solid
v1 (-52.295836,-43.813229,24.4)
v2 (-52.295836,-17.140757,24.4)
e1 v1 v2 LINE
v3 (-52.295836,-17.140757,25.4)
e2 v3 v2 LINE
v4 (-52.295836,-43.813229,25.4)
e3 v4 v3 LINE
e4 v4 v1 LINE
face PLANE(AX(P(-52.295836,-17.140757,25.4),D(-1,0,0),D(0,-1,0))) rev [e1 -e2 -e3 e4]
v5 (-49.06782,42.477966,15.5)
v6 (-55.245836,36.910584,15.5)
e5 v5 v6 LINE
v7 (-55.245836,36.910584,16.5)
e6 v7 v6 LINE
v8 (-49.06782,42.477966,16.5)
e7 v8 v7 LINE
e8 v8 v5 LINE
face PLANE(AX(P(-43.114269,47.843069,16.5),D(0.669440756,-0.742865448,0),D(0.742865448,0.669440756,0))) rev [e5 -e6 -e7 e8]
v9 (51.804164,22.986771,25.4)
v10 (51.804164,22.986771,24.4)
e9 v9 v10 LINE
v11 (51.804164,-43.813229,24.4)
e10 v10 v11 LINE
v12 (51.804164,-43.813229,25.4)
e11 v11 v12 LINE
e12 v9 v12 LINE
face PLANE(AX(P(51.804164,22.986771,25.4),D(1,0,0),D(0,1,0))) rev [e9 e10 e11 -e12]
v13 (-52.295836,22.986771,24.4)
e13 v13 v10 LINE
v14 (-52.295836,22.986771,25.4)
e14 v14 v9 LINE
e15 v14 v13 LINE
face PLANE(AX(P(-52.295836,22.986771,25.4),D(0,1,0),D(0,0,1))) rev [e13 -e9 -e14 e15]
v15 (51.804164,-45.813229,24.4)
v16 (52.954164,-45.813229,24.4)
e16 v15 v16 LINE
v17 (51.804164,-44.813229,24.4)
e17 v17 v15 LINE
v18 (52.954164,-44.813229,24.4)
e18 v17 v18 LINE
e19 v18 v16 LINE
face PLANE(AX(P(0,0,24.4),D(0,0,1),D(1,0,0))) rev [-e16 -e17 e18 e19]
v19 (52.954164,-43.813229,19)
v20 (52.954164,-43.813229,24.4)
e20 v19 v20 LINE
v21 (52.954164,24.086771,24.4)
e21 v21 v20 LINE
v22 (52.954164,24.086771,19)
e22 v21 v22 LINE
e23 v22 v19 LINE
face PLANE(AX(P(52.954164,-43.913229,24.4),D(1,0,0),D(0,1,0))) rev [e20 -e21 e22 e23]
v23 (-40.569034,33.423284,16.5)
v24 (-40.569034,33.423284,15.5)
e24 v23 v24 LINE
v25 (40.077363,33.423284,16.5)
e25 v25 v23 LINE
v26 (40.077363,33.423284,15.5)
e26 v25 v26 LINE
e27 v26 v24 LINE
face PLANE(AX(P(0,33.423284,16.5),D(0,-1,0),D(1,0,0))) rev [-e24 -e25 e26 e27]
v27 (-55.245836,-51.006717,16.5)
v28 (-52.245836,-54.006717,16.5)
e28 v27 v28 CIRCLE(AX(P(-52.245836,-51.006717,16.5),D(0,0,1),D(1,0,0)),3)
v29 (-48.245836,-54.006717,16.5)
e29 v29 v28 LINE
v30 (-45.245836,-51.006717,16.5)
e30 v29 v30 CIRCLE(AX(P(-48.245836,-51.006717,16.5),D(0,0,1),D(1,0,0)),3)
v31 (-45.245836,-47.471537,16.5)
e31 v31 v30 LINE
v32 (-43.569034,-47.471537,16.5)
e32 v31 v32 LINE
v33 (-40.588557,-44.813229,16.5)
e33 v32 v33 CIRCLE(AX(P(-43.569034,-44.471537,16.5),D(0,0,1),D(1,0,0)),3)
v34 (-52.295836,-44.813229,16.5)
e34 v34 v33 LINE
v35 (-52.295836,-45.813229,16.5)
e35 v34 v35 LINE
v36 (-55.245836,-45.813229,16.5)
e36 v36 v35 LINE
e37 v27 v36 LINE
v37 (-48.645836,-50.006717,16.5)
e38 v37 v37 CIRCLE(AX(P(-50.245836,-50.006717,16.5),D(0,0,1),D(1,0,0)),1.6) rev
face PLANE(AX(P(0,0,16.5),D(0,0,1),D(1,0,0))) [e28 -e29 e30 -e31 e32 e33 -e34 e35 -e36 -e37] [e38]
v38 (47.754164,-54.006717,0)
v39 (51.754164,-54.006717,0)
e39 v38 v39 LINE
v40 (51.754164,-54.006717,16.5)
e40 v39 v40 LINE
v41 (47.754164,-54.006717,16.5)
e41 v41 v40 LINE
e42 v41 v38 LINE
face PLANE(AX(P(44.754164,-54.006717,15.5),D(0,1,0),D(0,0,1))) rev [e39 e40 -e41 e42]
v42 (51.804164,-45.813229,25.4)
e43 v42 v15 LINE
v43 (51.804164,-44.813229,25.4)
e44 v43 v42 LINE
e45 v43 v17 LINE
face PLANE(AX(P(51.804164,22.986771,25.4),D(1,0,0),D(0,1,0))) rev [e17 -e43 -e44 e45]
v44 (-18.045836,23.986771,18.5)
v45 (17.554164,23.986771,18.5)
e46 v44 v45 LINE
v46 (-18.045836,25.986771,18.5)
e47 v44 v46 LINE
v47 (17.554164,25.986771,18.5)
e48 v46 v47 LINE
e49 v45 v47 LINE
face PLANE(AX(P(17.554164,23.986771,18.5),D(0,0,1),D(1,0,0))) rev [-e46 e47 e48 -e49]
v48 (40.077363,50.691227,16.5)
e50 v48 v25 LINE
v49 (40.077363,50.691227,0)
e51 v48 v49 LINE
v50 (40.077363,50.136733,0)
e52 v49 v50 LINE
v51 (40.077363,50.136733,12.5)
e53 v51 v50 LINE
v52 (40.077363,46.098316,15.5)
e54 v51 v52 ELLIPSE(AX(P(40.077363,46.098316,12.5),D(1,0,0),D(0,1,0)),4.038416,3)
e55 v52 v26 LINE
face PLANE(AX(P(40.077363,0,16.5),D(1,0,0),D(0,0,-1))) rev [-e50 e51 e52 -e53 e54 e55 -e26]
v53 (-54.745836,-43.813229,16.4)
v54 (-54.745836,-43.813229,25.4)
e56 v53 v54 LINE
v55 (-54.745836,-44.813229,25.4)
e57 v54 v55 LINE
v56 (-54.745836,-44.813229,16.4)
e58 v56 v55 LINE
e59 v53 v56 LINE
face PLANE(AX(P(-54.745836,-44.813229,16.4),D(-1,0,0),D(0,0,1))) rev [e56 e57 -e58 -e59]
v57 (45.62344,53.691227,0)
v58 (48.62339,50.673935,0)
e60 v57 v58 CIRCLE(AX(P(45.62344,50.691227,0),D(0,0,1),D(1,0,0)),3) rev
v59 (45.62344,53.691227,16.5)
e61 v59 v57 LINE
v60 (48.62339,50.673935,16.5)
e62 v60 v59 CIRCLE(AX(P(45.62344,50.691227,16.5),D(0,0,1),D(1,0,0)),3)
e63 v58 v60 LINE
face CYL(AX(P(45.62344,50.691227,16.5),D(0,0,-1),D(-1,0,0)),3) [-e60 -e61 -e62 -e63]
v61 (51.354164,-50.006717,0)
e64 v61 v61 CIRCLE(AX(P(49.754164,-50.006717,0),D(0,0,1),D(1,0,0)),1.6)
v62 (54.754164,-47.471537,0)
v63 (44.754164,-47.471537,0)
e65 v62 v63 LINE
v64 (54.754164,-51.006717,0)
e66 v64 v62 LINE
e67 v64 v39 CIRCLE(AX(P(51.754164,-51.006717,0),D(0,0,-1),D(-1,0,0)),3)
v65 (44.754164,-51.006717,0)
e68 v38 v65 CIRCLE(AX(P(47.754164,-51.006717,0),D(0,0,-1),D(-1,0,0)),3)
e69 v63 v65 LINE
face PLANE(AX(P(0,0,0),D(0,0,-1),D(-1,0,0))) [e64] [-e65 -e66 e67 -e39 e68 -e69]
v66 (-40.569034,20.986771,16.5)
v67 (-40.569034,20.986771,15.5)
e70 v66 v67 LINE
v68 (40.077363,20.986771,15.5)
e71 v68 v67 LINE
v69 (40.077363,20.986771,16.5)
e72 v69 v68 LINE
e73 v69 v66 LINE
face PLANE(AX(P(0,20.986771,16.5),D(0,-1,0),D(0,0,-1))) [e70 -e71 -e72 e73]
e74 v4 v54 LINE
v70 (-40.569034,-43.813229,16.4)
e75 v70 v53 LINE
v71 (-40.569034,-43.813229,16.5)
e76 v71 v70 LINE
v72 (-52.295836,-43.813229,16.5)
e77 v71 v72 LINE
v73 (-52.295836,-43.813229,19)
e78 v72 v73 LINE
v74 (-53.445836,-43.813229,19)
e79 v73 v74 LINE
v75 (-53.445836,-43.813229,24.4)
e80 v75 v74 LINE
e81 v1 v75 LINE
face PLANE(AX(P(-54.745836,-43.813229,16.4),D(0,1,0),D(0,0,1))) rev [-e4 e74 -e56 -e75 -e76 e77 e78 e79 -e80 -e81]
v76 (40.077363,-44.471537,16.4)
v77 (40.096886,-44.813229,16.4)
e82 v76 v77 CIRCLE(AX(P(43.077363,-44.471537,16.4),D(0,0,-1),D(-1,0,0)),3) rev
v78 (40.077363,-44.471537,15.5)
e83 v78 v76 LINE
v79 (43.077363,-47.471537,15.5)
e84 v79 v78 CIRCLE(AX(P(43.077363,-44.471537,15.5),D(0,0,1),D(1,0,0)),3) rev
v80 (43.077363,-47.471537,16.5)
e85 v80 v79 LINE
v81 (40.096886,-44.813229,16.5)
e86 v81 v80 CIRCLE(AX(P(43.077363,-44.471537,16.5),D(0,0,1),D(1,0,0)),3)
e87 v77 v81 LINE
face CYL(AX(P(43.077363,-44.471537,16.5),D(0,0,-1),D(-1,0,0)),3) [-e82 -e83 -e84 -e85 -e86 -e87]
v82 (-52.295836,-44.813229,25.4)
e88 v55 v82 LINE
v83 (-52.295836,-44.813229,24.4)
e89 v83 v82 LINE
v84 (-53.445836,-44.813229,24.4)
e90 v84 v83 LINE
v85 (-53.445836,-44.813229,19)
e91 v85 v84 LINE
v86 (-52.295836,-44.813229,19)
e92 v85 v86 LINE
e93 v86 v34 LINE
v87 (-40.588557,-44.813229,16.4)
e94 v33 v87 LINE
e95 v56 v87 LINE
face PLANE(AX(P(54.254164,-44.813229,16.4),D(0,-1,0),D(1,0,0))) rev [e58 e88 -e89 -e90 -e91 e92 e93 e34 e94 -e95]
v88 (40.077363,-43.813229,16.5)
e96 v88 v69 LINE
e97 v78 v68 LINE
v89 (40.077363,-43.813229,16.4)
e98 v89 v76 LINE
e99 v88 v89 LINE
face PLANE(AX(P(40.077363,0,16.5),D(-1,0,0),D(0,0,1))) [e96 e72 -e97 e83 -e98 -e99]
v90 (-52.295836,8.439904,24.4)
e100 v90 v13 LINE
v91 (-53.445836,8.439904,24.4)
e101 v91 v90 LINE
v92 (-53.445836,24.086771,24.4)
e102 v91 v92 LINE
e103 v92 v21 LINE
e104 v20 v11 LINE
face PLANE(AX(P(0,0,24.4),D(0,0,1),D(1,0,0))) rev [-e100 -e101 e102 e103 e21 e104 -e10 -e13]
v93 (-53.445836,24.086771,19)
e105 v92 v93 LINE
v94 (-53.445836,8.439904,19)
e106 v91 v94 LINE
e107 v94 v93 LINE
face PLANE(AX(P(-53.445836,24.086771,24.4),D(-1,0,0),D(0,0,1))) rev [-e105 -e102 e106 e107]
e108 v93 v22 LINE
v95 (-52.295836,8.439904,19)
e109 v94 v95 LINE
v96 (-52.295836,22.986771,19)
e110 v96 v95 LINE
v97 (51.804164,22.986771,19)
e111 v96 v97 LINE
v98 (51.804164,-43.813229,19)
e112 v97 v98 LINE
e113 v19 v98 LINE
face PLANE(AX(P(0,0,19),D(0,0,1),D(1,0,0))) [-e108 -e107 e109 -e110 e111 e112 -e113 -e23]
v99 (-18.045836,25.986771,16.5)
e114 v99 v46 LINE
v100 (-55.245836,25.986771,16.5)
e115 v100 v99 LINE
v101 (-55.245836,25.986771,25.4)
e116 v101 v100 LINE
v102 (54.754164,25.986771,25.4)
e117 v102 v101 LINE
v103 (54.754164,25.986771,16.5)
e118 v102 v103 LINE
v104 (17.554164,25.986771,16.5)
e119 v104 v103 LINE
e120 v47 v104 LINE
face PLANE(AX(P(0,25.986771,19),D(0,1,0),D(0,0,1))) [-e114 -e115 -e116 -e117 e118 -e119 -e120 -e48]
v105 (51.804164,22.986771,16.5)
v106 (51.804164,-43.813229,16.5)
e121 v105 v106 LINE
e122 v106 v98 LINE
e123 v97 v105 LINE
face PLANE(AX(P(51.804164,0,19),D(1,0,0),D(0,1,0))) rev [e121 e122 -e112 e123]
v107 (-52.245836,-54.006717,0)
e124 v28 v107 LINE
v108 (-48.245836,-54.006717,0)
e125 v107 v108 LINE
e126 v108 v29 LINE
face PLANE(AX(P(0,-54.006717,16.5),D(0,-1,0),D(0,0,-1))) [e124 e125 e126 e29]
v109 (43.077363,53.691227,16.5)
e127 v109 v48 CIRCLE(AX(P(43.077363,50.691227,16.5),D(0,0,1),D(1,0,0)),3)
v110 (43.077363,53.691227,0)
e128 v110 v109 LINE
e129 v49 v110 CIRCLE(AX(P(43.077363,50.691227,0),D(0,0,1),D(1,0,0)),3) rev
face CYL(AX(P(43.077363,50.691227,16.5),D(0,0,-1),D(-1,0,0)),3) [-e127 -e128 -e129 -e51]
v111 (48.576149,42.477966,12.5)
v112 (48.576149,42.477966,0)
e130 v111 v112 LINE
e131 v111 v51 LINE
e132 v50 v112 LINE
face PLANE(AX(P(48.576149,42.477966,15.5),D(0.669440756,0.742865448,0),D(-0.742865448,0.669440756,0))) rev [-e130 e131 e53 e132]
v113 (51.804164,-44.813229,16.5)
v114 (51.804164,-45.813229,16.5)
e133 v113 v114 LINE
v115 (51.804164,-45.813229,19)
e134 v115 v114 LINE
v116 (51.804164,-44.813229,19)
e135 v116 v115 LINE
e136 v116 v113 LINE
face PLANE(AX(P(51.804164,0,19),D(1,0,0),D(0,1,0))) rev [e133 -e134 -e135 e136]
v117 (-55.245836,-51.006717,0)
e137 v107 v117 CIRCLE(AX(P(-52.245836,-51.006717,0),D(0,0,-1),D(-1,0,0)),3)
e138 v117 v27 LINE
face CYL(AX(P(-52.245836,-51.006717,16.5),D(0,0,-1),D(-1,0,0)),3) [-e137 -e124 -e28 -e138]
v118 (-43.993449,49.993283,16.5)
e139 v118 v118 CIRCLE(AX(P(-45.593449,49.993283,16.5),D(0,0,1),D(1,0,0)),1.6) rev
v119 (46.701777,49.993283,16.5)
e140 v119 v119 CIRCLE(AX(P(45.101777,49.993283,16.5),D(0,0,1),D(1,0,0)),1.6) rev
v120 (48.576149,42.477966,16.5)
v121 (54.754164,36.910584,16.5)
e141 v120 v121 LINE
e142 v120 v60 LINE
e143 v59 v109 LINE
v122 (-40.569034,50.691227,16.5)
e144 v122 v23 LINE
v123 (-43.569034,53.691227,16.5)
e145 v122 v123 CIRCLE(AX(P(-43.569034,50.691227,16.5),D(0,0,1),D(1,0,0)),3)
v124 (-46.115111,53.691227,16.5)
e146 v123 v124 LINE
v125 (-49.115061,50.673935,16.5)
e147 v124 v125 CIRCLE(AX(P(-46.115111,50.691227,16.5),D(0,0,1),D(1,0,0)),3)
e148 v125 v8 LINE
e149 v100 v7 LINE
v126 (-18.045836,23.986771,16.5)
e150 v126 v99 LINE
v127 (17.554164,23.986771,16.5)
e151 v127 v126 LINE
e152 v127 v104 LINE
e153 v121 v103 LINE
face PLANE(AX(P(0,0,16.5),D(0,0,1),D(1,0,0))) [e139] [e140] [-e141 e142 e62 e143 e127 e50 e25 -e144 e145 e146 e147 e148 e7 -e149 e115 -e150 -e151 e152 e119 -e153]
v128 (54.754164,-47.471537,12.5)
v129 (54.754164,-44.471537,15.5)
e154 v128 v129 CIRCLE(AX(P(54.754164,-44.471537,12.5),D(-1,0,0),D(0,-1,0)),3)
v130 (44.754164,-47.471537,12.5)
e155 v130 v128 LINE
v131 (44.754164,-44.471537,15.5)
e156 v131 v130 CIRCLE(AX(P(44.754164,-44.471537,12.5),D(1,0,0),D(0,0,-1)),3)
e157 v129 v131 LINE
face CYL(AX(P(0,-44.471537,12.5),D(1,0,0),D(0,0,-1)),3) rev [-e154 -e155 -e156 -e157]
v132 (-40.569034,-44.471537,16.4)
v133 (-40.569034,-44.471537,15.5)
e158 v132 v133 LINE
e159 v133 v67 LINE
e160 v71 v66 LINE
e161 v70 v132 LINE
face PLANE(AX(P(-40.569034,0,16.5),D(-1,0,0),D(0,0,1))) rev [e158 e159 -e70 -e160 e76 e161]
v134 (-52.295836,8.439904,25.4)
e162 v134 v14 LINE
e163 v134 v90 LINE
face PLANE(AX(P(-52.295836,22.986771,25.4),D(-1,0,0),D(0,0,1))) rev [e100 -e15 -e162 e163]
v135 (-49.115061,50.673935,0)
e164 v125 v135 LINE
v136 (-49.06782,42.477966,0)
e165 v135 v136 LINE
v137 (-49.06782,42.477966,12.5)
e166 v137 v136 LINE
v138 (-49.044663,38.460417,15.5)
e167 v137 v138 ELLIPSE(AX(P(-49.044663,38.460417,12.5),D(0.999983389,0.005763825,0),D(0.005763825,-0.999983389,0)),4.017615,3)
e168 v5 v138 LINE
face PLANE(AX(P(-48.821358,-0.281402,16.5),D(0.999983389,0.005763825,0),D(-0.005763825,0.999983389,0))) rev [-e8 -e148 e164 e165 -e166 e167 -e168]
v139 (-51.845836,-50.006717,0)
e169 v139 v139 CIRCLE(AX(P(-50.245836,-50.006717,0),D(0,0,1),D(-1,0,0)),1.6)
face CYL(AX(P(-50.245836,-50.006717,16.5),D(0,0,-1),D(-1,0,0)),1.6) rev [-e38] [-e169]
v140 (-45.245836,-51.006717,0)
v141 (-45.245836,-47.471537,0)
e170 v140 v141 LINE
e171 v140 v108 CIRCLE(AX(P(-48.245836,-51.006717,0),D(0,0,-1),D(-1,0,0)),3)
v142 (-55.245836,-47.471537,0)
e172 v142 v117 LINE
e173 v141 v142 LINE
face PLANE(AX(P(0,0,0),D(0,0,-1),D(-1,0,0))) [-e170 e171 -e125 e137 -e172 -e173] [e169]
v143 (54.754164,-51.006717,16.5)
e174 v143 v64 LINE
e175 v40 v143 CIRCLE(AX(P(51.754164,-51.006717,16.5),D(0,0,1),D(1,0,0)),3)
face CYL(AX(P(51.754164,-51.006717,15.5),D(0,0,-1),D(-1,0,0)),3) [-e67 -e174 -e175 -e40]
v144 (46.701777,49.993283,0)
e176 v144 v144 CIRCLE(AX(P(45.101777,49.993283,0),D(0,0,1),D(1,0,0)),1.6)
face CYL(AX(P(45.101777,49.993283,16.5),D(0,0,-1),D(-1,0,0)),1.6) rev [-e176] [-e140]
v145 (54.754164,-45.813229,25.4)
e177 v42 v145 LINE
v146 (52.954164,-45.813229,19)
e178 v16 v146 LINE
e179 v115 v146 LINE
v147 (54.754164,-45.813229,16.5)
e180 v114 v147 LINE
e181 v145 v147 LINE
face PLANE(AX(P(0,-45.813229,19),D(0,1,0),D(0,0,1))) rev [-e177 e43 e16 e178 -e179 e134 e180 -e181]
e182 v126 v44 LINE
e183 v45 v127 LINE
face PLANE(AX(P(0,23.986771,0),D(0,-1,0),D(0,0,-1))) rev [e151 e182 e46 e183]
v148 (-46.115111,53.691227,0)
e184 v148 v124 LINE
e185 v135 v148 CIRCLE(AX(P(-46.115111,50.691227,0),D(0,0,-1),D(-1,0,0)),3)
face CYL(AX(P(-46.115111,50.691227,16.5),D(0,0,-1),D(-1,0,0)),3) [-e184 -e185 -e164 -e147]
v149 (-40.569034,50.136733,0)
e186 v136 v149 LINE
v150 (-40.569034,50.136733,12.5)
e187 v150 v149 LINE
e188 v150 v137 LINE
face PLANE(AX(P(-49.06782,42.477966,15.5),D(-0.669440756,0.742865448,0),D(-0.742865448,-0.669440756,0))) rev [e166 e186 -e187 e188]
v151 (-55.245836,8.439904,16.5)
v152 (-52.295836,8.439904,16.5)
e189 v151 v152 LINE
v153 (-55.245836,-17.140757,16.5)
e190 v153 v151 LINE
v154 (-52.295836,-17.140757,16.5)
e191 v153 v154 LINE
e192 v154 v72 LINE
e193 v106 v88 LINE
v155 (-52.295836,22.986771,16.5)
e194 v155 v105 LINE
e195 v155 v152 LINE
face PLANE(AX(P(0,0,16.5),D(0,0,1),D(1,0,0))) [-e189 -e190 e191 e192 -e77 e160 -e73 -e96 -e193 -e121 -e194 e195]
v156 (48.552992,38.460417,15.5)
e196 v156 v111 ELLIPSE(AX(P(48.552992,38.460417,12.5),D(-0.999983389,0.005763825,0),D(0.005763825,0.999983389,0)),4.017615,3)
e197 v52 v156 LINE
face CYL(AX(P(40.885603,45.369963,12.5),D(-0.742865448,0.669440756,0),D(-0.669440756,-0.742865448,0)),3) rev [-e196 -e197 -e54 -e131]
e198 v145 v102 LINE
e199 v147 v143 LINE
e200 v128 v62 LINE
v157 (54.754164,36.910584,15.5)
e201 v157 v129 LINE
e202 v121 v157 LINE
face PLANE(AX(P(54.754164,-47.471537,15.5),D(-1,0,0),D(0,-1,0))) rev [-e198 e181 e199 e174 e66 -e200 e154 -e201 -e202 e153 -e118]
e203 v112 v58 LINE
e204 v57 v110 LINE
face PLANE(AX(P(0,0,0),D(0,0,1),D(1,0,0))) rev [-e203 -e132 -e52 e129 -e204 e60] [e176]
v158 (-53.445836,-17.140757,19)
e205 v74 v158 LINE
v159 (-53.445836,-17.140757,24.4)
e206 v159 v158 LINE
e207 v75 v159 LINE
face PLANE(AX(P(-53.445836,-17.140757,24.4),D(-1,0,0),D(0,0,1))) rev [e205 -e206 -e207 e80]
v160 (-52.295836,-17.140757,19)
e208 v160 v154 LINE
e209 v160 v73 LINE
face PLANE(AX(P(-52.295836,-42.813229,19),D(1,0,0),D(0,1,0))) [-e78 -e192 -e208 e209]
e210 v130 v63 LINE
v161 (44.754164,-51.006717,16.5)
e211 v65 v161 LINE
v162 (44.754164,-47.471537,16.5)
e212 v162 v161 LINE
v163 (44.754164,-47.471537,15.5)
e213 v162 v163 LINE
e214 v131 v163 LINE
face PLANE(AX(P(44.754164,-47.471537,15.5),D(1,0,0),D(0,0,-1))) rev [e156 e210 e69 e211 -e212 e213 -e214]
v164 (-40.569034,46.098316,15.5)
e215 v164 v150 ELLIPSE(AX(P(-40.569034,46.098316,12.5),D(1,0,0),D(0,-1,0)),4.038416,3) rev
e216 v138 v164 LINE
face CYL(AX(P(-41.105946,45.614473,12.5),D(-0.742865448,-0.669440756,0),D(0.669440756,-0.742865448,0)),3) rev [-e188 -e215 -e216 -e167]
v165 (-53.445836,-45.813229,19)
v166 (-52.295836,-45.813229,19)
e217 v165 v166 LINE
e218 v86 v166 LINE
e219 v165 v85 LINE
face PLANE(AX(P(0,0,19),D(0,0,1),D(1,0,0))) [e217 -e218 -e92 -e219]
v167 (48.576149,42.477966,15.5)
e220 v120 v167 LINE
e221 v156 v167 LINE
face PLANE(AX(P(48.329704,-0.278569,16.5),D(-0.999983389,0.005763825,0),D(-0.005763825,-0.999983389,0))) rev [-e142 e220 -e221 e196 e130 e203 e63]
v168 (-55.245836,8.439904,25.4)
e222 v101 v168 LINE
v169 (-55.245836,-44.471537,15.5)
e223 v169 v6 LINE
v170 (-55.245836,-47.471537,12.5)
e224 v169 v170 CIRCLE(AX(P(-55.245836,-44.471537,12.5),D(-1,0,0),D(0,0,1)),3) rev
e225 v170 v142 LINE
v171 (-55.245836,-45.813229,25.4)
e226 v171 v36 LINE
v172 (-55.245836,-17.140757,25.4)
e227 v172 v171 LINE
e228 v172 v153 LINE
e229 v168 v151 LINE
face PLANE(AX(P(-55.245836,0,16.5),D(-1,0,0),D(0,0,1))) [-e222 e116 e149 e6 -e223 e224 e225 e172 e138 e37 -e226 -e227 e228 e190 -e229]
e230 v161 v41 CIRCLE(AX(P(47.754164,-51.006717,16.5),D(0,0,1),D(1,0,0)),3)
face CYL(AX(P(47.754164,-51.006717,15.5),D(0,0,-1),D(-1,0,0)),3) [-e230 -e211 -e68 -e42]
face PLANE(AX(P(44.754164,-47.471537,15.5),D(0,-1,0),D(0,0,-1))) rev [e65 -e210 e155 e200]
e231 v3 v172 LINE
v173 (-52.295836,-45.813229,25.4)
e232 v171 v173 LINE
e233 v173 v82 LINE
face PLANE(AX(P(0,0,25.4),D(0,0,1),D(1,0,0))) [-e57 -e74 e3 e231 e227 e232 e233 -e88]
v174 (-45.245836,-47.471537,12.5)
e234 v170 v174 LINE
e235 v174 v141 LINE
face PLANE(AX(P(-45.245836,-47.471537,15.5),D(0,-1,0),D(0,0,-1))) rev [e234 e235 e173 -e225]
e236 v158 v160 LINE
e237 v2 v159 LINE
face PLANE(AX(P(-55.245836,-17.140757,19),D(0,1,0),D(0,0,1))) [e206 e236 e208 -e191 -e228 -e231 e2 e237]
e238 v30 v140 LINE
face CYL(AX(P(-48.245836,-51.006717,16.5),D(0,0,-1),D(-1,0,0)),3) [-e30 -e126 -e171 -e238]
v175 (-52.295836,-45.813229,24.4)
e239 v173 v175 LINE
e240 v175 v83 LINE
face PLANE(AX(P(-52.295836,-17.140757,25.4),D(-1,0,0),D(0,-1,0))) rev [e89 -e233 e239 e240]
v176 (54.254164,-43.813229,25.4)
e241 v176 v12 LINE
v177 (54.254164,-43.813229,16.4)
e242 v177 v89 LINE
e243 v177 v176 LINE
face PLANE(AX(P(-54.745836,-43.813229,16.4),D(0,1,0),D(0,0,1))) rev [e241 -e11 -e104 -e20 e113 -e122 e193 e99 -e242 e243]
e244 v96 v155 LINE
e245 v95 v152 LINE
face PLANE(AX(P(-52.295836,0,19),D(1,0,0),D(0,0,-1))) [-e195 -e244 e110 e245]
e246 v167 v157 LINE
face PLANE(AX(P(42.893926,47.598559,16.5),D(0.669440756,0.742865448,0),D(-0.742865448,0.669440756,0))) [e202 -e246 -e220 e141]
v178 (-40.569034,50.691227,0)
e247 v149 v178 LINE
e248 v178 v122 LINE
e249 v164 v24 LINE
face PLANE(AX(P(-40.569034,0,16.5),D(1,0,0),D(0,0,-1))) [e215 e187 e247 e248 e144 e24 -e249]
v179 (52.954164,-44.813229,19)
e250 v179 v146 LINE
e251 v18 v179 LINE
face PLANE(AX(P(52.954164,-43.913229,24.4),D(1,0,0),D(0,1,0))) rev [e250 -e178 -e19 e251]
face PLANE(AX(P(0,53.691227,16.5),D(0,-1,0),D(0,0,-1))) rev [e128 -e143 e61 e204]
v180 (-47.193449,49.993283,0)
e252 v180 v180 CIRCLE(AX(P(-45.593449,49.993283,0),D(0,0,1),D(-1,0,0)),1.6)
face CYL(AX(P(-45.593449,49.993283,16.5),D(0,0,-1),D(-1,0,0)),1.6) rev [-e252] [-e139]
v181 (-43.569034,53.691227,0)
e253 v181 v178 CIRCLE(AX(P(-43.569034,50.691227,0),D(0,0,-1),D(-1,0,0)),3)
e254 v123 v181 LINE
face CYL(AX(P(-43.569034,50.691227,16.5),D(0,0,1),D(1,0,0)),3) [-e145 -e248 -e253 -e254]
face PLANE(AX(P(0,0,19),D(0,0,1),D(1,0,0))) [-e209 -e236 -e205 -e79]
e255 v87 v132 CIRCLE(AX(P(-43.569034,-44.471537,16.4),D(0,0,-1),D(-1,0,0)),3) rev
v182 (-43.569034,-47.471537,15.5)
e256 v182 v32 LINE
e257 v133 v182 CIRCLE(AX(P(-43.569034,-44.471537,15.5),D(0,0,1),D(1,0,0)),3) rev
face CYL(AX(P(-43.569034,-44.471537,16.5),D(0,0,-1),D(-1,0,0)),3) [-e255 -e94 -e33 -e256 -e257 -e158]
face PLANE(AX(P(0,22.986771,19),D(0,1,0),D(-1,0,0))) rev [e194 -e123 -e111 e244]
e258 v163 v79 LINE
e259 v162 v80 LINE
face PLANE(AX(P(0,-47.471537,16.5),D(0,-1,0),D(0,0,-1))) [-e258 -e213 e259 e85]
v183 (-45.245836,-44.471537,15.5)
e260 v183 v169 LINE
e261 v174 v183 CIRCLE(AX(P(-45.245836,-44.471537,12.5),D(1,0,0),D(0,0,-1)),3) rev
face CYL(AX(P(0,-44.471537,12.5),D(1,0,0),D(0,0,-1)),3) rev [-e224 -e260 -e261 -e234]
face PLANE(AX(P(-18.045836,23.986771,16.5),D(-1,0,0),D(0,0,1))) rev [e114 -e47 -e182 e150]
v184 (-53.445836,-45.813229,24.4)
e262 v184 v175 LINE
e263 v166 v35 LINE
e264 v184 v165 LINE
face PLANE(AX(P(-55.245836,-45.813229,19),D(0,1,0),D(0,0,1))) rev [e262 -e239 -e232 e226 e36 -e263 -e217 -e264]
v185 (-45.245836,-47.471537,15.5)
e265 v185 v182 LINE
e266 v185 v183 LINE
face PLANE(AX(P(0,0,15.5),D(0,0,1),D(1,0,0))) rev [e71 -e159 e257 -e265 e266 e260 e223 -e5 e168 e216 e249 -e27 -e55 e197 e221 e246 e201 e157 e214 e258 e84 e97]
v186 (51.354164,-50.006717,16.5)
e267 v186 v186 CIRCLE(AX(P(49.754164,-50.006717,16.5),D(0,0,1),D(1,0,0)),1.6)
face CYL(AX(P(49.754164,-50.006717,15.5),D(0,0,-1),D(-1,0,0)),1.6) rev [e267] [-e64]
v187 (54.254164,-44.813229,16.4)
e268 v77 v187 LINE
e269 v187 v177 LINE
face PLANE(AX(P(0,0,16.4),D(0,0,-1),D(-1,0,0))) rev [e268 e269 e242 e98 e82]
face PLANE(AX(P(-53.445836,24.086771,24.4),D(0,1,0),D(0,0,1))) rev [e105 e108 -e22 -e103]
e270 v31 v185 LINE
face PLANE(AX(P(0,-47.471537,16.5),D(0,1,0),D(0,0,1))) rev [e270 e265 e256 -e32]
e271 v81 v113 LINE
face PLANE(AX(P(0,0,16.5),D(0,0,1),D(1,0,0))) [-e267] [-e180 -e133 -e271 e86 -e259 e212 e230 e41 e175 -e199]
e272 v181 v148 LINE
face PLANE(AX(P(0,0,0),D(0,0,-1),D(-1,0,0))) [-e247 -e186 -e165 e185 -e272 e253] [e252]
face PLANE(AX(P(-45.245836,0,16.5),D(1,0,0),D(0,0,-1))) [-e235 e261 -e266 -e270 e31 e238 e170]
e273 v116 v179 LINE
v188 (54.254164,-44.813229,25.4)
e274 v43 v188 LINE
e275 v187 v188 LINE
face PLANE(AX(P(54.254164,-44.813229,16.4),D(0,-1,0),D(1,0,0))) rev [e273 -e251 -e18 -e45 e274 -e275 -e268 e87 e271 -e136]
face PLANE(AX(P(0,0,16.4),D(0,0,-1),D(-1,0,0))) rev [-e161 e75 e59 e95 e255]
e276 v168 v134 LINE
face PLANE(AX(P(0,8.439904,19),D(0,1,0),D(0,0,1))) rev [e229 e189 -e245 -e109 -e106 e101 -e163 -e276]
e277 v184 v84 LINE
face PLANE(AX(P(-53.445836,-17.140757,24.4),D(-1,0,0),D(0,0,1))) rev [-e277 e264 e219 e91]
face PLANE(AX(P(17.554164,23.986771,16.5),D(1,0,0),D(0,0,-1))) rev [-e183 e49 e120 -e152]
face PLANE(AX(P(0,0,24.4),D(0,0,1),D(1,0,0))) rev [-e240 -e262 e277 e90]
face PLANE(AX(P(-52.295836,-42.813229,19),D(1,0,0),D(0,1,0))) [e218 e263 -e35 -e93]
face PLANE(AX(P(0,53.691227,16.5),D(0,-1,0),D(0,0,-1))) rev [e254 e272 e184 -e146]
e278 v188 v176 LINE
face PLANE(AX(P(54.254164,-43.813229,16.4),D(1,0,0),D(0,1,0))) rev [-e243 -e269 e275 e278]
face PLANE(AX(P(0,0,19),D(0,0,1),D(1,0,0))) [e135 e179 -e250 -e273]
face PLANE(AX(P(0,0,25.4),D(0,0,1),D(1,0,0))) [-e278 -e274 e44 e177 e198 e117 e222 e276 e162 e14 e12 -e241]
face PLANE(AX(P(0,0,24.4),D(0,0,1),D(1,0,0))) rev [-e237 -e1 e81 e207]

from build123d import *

# Parameters (mm, degrees)
SKETCH1_W             = 6.535180092
SKETCH1_H             = 10
SKETCH1_R             = 1.6
BOSS_EXTRUDE1_DEPTH   = 15.5
BOSS_EXTRUDE1_2_DEPTH = 15.5
BOSS_EXTRUDE1_3_DEPTH = 15.5
BOSS_EXTRUDE1_4_DEPTH = 15.5
SKETCH2_R             = 1.6
BOSS_EXTRUDE2_DEPTH   = 1
SKETCH3_W             = 2.95
SKETCH3_H             = 28.672472045
BOSS_EXTRUDE3_DEPTH   = 2.5
BOSS_EXTRUDE4_DEPTH   = 5.4
SKETCH5_W             = 2.95
SKETCH5_H             = 28.672472045
BOSS_EXTRUDE5_DEPTH   = 1
SKETCH7_W             = 109
SKETCH7_H             = 1
CUT_EXTRUDE1_DEPTH    = 9
FILLET1_R             = 3
FILLET2_R             = 3
SKETCH8_W             = 35.6
SKETCH8_H             = 2
CUT_EXTRUDE2_DEPTH    = 2


with BuildPart() as part:
    # Sketch1 → Boss-Extrude1 (new body)
    with BuildSketch(Plane(origin=(0, 0, 0), x_dir=(0, 1, 0), z_dir=(0, 0, 1))):
        with Locations((-50.739127193, -49.754164457)):
            Rectangle(SKETCH1_W, SKETCH1_H)
        with Locations(Location((-50.006717239, -49.754164457, 0), (0, 0, 270))):
            Circle(SKETCH1_R, mode=Mode.SUBTRACT)
    extrude(amount=BOSS_EXTRUDE1_DEPTH)



with BuildPart() as body_2:
    # Sketch1 → Boss-Extrude1 2 (new body)
    with BuildSketch(Plane(origin=(0, 0, 0), x_dir=(0, 1, 0), z_dir=(0, 0, 1))):
        Polygon((42.477965747, -48.576148962), (50.136732851, -40.077363358), (53.691226628, -40.077363358), (53.691226628, -48.640781304), align=None)
        with Locations(Location((49.993282761, -45.101777457, 0), (0, 0, 270))):
            Circle(SKETCH1_R, mode=Mode.SUBTRACT)
    extrude(amount=BOSS_EXTRUDE1_2_DEPTH)


with BuildPart() as body_3:
    # Sketch1 → Boss-Extrude1 3 (new body)
    with BuildSketch(Plane(origin=(0, 0, 0), x_dir=(0, 1, 0), z_dir=(0, 0, 1))):
        Polygon((53.691226628, 49.132452389), (42.477965747, 49.067820047), (50.136732851, 40.569034443), (53.691226628, 40.569034443), align=None)
        with Locations(Location((49.993282761, 45.593448542, 0), (0, 0, 90))):
            Circle(SKETCH1_R, mode=Mode.SUBTRACT)
    extrude(amount=BOSS_EXTRUDE1_3_DEPTH)


with BuildPart() as body_4:
    # Sketch1 → Boss-Extrude1 4 (new body)
    with BuildSketch(Plane(origin=(0, 0, 0), x_dir=(0, 1, 0), z_dir=(0, 0, 1))):
        with Locations((-50.739127193, 50.245835543)):
            Rectangle(SKETCH1_W, SKETCH1_H)
        with Locations(Location((-50.006717239, 50.245835543, 0), (0, 0, 90))):
            Circle(SKETCH1_R, mode=Mode.SUBTRACT)
    extrude(amount=BOSS_EXTRUDE1_4_DEPTH)


with BuildPart() as part_1:
    add(part.part)

    add(body_2.part)  # Boss-Extrude2 merges body 2

    add(body_3.part)  # Boss-Extrude2 merges body 3

    add(body_4.part)  # Boss-Extrude2 merges body 4
    # Sketch2 → Boss-Extrude2 (add)
    with BuildSketch(Plane.XY.offset(15.5)):
        Polygon((54.754164457, -47.471537147), (54.754164457, -54.006717239), (44.754164457, -54.006717239), (44.754164457, -47.471537147), (40.077363358, -47.471537147), (40.077363358, 20.986771333), (-40.569034443, 20.986771333), (-40.569034443, -47.471537147), (-45.245835543, -47.471537147), (-45.245835543, -54.006717239), (-55.245835543, -54.006717239), (-55.245835543, -47.471537147), (-55.245835543, 36.910584236), (-49.067820047, 42.477965747), (-49.132452389, 53.691226628), (-40.569034443, 53.691226628), (-40.569034443, 33.42328432), (40.077363358, 33.42328432), (40.077363358, 53.691226628), (48.640781304, 53.691226628), (48.576148962, 42.477965747), (54.754164457, 36.910584236), align=None)
        with Locations((49.754164457, -50.006717239)):
            Circle(SKETCH2_R, mode=Mode.SUBTRACT)
        with Locations((45.101777457, 49.993282761)):
            Circle(SKETCH2_R, mode=Mode.SUBTRACT)
        with Locations(Location((-45.593448542, 49.993282761, 0), (0, 0, 180))):
            Circle(SKETCH2_R, mode=Mode.SUBTRACT)
        with Locations(Location((-50.245835543, -50.006717239, 0), (0, 0, 180))):
            Circle(SKETCH2_R, mode=Mode.SUBTRACT)
    extrude(amount=BOSS_EXTRUDE2_DEPTH)

    # Sketch3 → Boss-Extrude3 (add)
    with BuildSketch(Plane.XY.offset(16.5)):
        Polygon((-52.295835543, 8.439904174), (-52.295835543, 22.986771333), (51.804164457, 22.986771333), (51.804164457, -45.813228667), (54.754164457, -45.813228667), (54.754164457, 25.986771333), (-55.245835543, 25.986771333), (-55.245835543, 8.439904174), align=None)
        with Locations((-53.770835543, -31.476992645)):
            Rectangle(SKETCH3_W, SKETCH3_H)
    extrude(amount=BOSS_EXTRUDE3_DEPTH)

    # Sketch4 → Boss-Extrude4 (add)
    with BuildSketch(Plane.XY.offset(19)):
        Polygon((-55.245835543, 25.986771333), (54.754164457, 25.986771333), (54.754164457, -45.813228667), (52.954164457, -45.813228667), (52.954164457, -43.913228667), (52.954164457, 24.086771333), (-53.445835543, 24.086771333), (-53.445835543, 8.439904174), (-55.245835543, 8.439904174), align=None)
        Polygon((-55.245835543, -45.813228667), (-53.445835543, -45.813228667), (-53.445835543, -43.913228667), (-53.445835543, -17.140756622), (-55.245835543, -17.140756622), align=None)
    extrude(amount=BOSS_EXTRUDE4_DEPTH)

    # Sketch5 → Boss-Extrude5 (add)
    with BuildSketch(Plane.XY.offset(24.4)):
        Polygon((-55.245835543, 8.439904174), (-52.295835543, 8.439904174), (-52.295835543, 22.986771333), (51.804164457, 22.986771333), (51.804164457, -45.813228667), (54.754164457, -45.813228667), (54.754164457, 25.986771333), (-55.245835543, 25.986771333), align=None)
        with Locations((-53.770835543, -31.476992645)):
            Rectangle(SKETCH5_W, SKETCH5_H)
    extrude(amount=BOSS_EXTRUDE5_DEPTH)

    # Sketch7 → Cut-Extrude1 (cut)
    with BuildSketch(Plane.XY.offset(25.4)):
        with Locations((-0.245835543, -44.313228667)):
            Rectangle(SKETCH7_W, SKETCH7_H)
    extrude(amount=-CUT_EXTRUDE1_DEPTH, mode=Mode.SUBTRACT)

    # Fillet1
    fillet1_edges = [part_1.edges().sort_by_distance(p)[0] for p in [
        (48.640781304, 53.691226628, 7.75),
        (-49.132452389, 53.691226628, 7.75),
        (-40.569034443, -47.471537147, 16),
        (-55.245835543, -54.006717239, 8.25),
        (-45.245835543, -54.006717239, 8.25),
        (40.077363358, -47.471537147, 16),
        (44.754164457, -54.006717239, 8.25),
        (54.754164457, -54.006717239, 8.25),
        (40.077363358, 53.691226628, 7.75),
        (-40.569034443, 53.691226628, 7.75),
    ]]
    fillet(fillet1_edges, radius=FILLET1_R)

    # Fillet2
    # the kernel refuses this fillet: 3 mm, written as the material it adds along each edge
    with BuildSketch(Plane(origin=(54.147639825, 37.457160078, 15.5), x_dir=(0, 0, -1), z_dir=(-0.7428654483971854, 0.6694407558385198, 0))) as fillet2_piece_1_section:
        with BuildLine():
            CenterArc((FILLET2_R, FILLET2_R), FILLET2_R, 180, 90)
            Line((0, FILLET2_R), (0, 0))
            Line((0, 0), (FILLET2_R, 0))
        make_face()
    fillet2_piece_1 = extrude(amount=26.440545017, mode=Mode.PRIVATE)
    fillet2_piece_1 = split(fillet2_piece_1, bisect_by=Plane(origin=(48.592895704, 45.383408694, 14.829727011), z_dir=(-0.9999833890252455, 0.005763824562264406, 0)), keep=Keep.TOP, mode=Mode.PRIVATE)
    fillet2_piece_1 = split(fillet2_piece_1, bisect_by=Plane(origin=(40.077363358, 45.408013282, 14.829727011), z_dir=(1, 0, 0)), keep=Keep.TOP, mode=Mode.PRIVATE)
    add(fillet2_piece_1)
    with BuildSketch(Plane(origin=(-54.63931091, 37.457160078, 15.5), x_dir=(0, 0, -1), z_dir=(0.7428654483971854, 0.6694407558385198, 0))) as fillet2_piece_2_section:
        with BuildLine():
            CenterArc((FILLET2_R, -FILLET2_R), FILLET2_R, 90, 90)
            Line((0, -FILLET2_R), (0, 0))
            Line((0, 0), (FILLET2_R, 0))
        make_face()
    fillet2_piece_2 = extrude(amount=26.440545017, mode=Mode.PRIVATE)
    fillet2_piece_2 = split(fillet2_piece_2, bisect_by=Plane(origin=(-40.569034443, 45.408013282, 14.829727011), z_dir=(-1, 0, 0)), keep=Keep.TOP, mode=Mode.PRIVATE)
    fillet2_piece_2 = split(fillet2_piece_2, bisect_by=Plane(origin=(-49.084566789, 45.383408694, 14.829727011), z_dir=(0.9999833890252455, 0.005763824562264406, 0)), keep=Keep.TOP, mode=Mode.PRIVATE)
    add(fillet2_piece_2)
    with BuildSketch(Plane(origin=(-45.245835543, -47.471537147, 15.5), x_dir=(0, 0, -1), z_dir=(-1, 0, 0)), Plane(origin=(44.754164457, -47.471537147, 15.5), x_dir=(0, 1, 0), z_dir=(1, 0, 0))) as fillet2_piece_3:
        with BuildLine():
            CenterArc((FILLET2_R, -FILLET2_R), FILLET2_R, 90, 90)
            Line((0, -FILLET2_R), (0, 0))
            Line((0, 0), (FILLET2_R, 0))
        make_face()
    extrude(amount=10)

    # Sketch8 → Cut-Extrude2 (cut)
    with BuildSketch(Plane(origin=(0, 25.986771333, 0), x_dir=(-1, 0, 0), z_dir=(0, 1, 0))):
        with Locations((0.245835543, 17.5)):
            Rectangle(SKETCH8_W, SKETCH8_H)
    extrude(amount=-CUT_EXTRUDE2_DEPTH, mode=Mode.SUBTRACT)


solid = part_1.part
